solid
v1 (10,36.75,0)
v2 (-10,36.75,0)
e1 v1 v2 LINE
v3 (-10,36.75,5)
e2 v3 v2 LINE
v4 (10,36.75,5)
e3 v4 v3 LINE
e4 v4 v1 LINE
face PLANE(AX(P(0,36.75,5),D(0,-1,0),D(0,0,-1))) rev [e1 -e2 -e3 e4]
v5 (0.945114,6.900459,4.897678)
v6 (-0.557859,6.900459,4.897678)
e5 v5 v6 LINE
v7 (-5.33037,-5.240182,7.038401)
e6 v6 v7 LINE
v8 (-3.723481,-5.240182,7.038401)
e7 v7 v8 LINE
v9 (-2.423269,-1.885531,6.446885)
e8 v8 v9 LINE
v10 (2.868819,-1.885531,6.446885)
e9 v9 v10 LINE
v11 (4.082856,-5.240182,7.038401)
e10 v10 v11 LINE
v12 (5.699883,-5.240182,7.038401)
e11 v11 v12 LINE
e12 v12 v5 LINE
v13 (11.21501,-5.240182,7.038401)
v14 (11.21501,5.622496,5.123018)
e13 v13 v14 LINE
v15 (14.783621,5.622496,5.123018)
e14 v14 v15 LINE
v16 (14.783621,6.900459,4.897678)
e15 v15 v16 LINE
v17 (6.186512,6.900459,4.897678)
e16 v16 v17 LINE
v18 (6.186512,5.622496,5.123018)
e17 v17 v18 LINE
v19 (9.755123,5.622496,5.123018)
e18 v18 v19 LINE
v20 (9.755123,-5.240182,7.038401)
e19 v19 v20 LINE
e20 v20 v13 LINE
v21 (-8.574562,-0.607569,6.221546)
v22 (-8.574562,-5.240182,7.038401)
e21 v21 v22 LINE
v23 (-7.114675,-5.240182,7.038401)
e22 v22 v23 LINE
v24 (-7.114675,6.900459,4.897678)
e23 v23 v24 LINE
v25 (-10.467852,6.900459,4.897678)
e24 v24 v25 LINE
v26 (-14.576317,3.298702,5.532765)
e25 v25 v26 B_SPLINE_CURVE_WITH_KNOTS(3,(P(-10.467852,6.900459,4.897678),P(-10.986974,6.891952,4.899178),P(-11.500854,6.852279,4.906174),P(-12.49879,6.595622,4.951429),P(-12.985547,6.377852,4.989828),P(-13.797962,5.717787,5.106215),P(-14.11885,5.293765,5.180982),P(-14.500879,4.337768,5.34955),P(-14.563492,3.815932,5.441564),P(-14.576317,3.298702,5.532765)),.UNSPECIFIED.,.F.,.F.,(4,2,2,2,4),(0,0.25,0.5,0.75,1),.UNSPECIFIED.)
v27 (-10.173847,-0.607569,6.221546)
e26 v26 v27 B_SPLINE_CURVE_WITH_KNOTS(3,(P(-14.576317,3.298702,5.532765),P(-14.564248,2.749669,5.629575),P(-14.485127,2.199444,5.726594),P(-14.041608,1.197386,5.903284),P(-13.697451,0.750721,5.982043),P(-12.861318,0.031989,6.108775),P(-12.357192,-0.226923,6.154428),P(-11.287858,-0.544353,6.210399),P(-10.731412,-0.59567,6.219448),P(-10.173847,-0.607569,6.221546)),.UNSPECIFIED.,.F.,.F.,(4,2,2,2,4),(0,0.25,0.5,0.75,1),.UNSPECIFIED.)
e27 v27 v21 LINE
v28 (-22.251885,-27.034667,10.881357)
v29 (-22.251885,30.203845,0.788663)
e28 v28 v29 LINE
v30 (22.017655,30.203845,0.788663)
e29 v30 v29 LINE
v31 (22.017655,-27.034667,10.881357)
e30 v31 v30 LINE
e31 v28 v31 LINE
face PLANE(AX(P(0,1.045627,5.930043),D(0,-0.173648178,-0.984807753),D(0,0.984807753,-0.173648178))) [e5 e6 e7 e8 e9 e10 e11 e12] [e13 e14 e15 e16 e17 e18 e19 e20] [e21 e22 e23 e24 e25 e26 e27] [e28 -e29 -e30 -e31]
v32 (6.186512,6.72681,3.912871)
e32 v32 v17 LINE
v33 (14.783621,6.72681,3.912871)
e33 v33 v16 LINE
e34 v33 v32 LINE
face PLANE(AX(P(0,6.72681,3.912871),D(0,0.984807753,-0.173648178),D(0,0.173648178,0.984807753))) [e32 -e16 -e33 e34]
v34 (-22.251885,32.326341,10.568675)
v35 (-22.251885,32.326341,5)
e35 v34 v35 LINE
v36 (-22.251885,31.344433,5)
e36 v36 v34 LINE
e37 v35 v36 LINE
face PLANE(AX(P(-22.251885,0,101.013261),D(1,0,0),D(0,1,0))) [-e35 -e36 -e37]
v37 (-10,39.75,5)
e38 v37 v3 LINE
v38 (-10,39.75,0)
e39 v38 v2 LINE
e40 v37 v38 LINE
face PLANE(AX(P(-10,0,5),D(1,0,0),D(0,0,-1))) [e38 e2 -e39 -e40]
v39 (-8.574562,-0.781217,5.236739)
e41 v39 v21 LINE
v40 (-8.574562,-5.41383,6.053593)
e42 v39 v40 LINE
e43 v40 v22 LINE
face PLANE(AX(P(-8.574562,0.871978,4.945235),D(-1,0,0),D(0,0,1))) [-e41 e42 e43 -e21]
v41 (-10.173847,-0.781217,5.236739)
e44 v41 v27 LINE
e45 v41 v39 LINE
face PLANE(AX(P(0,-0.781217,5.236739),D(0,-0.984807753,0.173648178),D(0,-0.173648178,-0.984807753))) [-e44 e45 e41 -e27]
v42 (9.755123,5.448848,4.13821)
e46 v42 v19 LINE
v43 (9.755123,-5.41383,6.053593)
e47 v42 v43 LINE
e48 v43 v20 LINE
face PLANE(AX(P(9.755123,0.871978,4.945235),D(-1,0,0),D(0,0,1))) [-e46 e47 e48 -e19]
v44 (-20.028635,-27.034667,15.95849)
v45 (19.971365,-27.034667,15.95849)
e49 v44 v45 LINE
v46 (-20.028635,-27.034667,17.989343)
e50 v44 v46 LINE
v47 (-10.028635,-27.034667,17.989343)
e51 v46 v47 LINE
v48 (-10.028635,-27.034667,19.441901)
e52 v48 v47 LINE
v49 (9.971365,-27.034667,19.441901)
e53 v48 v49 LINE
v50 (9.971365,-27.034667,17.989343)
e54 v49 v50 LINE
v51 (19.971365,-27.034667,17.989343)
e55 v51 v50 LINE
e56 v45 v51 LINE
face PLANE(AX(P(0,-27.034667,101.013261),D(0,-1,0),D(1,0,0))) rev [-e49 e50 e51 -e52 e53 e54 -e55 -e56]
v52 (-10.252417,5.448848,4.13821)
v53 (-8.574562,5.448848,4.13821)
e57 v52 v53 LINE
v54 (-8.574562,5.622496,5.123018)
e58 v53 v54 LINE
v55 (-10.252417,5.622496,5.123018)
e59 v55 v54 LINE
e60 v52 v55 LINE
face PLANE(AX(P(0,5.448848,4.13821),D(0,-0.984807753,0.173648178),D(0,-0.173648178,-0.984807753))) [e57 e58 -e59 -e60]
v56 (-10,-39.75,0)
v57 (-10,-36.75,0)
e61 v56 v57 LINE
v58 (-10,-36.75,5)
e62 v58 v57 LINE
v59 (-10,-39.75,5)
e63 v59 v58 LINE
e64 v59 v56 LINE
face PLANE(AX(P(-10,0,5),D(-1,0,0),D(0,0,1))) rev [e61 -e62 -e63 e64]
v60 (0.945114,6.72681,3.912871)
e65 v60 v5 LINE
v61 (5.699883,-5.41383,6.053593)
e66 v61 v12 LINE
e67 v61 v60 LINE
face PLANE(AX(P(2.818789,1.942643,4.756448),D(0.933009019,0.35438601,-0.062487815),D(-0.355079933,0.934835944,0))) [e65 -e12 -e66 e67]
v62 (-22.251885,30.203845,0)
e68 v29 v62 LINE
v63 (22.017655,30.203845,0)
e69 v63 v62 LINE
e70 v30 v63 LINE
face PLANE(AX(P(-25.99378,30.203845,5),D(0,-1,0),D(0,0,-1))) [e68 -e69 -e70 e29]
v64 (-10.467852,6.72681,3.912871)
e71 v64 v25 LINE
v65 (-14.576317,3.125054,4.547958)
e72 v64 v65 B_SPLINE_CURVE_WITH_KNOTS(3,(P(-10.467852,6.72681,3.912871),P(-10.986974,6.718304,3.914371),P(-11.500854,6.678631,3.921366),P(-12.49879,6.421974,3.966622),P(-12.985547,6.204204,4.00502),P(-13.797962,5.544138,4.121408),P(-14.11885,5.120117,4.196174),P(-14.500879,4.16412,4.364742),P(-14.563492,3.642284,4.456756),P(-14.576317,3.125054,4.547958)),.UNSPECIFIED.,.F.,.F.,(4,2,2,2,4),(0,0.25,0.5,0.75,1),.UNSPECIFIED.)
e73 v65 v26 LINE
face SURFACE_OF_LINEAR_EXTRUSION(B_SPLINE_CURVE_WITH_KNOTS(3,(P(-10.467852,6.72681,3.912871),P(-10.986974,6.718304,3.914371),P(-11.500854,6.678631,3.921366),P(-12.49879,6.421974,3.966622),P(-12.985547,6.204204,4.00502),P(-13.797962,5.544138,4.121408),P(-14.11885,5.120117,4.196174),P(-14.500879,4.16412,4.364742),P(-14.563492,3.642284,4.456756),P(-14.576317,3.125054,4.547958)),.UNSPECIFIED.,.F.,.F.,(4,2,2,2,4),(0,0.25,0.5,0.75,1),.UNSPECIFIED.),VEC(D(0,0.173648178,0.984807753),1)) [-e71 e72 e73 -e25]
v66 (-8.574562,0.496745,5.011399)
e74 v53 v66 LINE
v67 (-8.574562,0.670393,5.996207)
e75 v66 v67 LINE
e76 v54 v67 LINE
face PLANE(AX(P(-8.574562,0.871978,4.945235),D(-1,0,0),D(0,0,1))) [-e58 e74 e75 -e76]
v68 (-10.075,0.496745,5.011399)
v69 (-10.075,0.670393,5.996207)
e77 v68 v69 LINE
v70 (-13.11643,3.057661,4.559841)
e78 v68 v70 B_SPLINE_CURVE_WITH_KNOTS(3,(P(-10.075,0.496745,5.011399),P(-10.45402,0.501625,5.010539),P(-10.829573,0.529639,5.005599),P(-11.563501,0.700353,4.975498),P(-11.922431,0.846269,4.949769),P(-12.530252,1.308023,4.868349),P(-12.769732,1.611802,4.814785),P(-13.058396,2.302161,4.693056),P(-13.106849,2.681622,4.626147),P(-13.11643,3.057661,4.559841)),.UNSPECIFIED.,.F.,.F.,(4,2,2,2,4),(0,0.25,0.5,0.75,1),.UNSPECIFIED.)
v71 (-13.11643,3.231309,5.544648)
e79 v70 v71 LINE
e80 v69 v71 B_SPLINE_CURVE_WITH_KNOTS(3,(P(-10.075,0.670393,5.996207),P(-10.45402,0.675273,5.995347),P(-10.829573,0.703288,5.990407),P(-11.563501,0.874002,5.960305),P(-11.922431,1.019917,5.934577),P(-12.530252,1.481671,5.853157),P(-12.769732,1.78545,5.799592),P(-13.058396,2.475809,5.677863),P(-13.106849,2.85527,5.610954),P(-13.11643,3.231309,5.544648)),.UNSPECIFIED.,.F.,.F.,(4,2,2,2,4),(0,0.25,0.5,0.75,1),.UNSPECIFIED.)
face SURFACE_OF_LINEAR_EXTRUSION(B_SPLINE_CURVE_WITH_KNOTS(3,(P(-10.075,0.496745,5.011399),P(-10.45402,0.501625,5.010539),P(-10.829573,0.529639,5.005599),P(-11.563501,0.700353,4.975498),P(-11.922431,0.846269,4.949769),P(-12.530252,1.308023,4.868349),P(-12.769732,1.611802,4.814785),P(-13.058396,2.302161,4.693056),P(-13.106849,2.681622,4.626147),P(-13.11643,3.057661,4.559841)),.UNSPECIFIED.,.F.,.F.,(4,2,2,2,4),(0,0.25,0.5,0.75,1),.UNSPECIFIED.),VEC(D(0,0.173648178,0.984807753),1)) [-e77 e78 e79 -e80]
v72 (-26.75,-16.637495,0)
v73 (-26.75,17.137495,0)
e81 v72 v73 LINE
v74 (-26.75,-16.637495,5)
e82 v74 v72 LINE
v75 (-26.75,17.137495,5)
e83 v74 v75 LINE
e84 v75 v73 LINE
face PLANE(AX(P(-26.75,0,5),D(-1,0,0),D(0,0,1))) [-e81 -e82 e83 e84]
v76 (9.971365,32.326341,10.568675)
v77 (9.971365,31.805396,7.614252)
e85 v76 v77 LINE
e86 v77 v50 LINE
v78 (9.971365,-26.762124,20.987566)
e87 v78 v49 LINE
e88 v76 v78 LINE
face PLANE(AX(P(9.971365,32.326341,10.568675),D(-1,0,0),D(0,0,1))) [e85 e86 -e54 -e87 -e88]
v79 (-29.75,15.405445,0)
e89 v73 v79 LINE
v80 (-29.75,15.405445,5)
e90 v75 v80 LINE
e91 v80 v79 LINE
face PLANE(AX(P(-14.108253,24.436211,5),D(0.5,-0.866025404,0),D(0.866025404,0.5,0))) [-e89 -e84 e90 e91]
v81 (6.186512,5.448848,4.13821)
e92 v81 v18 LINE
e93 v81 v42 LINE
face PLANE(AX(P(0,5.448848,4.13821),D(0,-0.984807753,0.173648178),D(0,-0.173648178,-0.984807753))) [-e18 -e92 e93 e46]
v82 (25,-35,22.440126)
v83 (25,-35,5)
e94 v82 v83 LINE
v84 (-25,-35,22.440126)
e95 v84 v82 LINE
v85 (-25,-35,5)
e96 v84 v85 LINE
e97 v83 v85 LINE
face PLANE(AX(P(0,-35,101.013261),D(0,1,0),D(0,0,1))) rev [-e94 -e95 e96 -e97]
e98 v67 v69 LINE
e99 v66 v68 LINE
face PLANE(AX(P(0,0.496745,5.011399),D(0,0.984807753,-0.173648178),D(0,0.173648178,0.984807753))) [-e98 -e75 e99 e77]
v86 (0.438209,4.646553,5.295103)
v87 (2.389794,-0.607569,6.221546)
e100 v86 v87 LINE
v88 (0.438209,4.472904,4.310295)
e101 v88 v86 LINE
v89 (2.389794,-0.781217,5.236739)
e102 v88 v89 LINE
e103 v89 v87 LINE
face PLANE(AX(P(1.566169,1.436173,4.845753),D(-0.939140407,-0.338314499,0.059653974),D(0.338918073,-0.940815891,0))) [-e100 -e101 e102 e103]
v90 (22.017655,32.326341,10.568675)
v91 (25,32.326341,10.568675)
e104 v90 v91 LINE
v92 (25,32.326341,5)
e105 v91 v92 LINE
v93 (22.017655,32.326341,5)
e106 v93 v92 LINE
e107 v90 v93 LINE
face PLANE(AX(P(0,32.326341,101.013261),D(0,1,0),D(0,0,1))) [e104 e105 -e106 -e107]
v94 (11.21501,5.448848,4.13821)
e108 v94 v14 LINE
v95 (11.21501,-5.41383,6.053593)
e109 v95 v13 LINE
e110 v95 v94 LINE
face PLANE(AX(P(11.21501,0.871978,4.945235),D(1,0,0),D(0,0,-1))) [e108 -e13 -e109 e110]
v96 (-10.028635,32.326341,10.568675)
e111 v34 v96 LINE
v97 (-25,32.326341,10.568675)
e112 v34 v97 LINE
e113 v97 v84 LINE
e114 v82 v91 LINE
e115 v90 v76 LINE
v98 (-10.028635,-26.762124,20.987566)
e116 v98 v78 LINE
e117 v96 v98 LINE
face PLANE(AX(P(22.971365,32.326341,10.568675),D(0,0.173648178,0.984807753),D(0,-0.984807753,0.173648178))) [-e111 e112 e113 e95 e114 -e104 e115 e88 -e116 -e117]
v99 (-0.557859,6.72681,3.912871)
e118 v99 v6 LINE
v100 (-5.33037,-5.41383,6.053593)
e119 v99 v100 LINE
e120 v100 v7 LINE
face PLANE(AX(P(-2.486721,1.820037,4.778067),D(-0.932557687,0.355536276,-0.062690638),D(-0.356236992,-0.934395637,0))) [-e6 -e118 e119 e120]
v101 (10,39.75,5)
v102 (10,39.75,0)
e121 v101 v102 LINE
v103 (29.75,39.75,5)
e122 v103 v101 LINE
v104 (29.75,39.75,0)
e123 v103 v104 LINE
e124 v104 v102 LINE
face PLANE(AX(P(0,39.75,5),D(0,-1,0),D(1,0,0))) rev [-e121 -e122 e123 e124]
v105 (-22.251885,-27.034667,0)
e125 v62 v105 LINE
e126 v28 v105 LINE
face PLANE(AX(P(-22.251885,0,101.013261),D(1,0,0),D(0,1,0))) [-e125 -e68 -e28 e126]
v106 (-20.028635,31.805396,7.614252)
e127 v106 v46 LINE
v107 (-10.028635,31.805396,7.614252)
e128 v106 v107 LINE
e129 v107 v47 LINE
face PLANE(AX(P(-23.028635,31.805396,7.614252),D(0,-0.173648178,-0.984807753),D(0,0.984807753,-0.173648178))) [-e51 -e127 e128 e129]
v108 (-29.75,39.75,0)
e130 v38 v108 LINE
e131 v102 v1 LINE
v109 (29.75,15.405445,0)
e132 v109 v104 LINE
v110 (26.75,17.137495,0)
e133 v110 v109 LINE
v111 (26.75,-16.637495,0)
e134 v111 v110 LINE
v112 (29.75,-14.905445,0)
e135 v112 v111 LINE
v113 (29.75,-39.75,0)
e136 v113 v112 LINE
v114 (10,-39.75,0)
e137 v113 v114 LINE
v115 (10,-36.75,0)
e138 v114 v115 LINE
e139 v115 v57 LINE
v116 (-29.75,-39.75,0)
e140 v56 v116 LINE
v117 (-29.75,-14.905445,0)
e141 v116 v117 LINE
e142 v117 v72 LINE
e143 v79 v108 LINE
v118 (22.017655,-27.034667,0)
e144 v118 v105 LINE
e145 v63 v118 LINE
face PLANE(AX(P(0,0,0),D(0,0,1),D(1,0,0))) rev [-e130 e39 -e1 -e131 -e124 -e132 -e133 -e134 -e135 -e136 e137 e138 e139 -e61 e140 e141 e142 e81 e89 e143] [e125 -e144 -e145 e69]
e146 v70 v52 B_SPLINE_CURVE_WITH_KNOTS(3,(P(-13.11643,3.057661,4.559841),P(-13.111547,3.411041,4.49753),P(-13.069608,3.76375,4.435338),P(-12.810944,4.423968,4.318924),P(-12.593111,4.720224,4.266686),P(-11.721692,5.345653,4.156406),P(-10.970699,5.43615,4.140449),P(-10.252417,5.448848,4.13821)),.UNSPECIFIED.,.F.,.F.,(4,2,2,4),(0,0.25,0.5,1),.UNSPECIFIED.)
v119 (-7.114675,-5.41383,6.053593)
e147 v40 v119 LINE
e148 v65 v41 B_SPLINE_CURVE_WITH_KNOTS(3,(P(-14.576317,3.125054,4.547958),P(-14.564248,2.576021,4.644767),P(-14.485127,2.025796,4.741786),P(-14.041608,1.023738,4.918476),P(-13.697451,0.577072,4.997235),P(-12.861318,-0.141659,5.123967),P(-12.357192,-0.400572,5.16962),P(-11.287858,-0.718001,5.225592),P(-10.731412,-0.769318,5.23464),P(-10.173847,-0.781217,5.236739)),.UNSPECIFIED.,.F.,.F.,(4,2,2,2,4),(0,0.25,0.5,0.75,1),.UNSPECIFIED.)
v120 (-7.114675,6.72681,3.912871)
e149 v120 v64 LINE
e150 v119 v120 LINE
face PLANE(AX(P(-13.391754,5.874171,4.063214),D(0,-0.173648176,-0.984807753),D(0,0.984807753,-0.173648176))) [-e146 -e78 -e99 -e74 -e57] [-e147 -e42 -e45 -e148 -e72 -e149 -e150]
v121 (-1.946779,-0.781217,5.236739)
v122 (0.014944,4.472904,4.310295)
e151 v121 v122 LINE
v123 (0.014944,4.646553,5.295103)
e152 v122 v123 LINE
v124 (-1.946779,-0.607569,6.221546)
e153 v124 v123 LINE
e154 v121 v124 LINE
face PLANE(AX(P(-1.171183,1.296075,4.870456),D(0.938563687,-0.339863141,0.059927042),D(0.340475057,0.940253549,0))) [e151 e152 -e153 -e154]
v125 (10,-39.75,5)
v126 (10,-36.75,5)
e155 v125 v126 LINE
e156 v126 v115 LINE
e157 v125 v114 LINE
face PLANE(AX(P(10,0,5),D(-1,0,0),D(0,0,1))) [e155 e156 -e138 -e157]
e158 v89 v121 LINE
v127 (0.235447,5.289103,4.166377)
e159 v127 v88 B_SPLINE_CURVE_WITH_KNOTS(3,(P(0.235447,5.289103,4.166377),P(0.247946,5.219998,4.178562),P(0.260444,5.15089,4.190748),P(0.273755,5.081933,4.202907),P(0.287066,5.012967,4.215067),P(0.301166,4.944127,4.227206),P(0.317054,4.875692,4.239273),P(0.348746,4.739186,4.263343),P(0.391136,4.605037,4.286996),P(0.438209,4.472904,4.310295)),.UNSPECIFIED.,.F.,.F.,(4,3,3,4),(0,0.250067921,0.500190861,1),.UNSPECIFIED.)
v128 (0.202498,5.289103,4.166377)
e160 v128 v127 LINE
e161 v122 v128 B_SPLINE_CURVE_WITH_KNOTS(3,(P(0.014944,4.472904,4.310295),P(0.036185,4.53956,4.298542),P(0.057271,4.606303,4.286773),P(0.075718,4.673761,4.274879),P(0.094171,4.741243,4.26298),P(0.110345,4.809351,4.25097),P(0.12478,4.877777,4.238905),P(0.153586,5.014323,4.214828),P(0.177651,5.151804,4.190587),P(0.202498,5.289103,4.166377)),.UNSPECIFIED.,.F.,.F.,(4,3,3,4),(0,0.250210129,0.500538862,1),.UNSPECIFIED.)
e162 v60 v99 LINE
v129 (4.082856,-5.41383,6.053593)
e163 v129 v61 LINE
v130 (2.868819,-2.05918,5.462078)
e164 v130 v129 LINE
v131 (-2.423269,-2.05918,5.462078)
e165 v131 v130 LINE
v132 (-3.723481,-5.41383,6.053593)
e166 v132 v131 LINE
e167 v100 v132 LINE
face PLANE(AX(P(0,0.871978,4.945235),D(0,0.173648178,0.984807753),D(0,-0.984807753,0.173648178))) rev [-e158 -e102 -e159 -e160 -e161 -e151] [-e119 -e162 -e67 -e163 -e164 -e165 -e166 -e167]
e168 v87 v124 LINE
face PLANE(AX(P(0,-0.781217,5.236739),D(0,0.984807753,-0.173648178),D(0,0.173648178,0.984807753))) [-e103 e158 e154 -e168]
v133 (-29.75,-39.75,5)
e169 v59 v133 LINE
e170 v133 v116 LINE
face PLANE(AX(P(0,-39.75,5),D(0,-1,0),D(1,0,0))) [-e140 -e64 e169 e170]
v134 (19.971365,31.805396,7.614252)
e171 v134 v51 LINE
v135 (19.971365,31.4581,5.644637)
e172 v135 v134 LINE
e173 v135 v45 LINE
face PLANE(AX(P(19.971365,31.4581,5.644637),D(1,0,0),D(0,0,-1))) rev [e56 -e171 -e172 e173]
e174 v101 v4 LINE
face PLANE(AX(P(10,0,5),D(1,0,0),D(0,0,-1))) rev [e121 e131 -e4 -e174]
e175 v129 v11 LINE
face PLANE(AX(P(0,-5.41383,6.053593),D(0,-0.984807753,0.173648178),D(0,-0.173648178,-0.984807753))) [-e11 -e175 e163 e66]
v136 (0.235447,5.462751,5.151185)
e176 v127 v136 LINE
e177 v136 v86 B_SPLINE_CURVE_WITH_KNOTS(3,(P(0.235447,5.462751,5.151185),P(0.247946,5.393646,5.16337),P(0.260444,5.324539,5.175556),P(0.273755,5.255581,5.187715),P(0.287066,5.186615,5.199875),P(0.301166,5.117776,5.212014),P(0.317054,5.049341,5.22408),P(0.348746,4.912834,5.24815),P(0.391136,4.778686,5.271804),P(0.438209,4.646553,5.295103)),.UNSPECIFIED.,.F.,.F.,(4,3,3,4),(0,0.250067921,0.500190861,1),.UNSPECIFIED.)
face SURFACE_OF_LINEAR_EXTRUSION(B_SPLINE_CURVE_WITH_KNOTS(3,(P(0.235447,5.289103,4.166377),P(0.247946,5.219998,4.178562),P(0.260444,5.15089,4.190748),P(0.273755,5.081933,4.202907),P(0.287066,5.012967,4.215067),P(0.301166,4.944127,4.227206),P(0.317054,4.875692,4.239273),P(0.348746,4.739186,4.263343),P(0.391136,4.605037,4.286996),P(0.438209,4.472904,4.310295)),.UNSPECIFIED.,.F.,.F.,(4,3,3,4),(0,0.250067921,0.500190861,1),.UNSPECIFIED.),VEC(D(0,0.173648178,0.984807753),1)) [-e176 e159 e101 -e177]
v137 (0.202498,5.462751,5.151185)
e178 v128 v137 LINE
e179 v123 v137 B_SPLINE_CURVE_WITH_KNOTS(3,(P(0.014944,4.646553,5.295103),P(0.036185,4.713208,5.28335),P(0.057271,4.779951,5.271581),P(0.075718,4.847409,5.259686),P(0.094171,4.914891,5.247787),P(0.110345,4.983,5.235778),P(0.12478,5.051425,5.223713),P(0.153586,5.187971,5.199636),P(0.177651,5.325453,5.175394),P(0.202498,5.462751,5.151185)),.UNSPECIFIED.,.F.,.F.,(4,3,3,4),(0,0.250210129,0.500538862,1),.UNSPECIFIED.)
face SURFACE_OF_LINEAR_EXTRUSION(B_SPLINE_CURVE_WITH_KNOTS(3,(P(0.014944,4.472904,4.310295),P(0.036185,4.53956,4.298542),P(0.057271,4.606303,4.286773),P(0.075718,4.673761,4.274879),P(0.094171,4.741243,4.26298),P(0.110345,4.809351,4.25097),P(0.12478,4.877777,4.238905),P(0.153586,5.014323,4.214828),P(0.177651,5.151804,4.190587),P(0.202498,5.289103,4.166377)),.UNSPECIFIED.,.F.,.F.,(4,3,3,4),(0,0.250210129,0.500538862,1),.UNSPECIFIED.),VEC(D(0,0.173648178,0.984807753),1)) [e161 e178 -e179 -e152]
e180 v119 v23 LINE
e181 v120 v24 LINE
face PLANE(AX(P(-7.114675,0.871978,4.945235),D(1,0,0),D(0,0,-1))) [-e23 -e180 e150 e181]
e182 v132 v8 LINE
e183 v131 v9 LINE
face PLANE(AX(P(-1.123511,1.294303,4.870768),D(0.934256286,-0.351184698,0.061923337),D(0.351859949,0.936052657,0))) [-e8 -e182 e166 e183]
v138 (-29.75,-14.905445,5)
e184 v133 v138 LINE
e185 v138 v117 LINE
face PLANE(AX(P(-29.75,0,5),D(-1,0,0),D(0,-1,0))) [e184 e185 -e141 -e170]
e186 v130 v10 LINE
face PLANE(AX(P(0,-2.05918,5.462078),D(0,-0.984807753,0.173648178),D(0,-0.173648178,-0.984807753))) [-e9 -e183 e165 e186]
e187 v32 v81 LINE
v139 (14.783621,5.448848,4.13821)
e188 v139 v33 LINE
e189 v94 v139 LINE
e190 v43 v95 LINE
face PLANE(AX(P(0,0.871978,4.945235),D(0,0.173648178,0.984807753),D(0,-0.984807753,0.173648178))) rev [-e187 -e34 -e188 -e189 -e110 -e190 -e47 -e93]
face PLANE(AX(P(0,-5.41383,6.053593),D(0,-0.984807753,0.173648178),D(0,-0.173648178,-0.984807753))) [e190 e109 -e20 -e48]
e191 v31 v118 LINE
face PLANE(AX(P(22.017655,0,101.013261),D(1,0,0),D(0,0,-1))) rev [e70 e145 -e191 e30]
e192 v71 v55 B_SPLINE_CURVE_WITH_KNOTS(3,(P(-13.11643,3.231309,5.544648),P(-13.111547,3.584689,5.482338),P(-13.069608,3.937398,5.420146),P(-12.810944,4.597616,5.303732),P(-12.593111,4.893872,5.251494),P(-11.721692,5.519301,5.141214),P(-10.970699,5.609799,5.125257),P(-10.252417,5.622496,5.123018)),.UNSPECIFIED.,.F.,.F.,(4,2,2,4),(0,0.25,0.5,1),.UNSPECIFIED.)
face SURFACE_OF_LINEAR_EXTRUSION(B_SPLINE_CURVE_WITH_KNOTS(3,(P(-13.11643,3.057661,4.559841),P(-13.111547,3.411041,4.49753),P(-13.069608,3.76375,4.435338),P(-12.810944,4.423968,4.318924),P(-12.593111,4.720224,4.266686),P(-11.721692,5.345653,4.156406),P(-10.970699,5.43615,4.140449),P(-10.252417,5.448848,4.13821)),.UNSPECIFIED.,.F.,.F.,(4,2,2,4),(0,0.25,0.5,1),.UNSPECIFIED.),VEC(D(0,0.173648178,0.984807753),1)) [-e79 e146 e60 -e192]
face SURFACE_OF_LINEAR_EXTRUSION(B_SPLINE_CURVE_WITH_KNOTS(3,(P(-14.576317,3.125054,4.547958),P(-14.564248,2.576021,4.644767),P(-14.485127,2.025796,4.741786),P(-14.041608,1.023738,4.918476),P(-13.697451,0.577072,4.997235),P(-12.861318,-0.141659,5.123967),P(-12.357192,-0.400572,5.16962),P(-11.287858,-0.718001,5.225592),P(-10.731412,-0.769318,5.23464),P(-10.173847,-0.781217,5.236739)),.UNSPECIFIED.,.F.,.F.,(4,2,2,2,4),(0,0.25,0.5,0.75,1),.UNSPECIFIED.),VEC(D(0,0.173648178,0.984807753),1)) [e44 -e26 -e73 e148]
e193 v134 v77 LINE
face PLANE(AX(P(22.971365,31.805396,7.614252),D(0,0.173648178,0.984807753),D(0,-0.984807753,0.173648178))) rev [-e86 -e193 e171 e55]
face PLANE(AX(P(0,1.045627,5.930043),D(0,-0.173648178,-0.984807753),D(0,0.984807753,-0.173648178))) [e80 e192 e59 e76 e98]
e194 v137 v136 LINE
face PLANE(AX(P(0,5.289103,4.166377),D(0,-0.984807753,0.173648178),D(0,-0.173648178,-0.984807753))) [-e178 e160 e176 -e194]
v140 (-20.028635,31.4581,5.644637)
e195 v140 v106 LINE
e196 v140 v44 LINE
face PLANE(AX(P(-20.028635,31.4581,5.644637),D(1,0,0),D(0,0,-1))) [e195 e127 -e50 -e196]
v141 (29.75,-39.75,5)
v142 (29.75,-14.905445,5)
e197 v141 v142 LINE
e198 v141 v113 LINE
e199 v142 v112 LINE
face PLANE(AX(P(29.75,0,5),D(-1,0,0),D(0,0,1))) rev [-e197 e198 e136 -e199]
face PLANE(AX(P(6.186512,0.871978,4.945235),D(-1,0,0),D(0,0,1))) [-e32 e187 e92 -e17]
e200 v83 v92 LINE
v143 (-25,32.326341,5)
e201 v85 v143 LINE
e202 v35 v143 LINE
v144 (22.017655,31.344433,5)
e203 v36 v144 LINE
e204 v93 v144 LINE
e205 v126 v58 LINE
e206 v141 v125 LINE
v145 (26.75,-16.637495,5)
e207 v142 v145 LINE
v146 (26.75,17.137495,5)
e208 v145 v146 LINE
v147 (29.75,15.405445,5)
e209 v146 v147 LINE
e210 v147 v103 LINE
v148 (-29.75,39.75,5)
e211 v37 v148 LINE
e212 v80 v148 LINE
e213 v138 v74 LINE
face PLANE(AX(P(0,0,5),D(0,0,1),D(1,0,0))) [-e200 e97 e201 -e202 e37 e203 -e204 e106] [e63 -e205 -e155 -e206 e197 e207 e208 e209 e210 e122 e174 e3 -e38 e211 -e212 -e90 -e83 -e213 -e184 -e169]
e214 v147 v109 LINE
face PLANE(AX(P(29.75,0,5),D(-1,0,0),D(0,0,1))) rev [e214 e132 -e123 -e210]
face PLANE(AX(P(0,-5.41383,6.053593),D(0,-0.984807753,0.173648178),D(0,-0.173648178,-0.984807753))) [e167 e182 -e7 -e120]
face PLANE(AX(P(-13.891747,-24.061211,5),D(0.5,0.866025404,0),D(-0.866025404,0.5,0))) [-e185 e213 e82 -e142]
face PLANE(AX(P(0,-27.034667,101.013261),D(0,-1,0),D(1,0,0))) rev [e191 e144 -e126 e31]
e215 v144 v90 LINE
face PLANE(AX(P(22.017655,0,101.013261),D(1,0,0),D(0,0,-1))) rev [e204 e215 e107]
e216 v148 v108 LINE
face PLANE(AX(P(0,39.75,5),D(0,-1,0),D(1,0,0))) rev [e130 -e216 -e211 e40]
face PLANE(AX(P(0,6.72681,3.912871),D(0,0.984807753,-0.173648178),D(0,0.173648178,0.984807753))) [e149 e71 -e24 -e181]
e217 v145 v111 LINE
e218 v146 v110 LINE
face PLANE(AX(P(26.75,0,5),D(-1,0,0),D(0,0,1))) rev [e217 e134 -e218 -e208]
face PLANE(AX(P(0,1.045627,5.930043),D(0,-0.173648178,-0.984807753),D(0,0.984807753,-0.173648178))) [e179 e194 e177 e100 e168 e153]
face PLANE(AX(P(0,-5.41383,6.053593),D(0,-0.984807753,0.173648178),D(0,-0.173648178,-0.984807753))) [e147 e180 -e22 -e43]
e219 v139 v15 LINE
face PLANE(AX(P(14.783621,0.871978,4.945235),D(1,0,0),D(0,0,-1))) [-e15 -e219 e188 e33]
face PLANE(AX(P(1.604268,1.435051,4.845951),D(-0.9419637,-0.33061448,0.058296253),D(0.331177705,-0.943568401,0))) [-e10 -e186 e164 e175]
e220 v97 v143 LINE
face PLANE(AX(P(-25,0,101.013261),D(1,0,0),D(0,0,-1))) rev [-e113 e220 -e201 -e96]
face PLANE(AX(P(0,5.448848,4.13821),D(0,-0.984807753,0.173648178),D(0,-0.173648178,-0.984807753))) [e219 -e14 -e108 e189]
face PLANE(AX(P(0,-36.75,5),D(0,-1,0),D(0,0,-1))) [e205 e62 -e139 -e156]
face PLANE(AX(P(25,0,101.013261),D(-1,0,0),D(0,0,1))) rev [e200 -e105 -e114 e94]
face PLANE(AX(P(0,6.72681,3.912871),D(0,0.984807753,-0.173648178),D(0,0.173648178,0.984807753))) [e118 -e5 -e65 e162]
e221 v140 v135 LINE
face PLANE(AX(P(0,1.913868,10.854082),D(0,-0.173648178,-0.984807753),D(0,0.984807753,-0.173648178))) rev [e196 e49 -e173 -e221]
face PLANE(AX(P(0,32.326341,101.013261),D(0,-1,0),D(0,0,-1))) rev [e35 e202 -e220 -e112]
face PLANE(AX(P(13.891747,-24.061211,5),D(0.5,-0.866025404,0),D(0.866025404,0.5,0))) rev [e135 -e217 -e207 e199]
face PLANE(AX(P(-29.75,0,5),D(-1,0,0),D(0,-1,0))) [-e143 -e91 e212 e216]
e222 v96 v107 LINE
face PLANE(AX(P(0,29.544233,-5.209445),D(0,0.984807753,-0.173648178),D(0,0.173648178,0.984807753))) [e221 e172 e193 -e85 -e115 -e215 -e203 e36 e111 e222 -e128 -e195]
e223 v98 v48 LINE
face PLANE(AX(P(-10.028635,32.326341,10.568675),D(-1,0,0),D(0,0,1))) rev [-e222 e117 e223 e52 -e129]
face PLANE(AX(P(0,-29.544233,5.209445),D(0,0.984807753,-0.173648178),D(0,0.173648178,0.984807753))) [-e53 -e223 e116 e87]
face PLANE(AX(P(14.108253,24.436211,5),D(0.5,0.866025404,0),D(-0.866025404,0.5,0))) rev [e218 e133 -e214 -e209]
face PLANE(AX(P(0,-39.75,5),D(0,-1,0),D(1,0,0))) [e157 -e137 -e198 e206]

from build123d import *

# Parameters (mm, degrees)
BOSS_EXTRUDE1_DEPTH = 5
SKETCH8_W           = 50
SKETCH8_H           = 70
CUT_EXTRUDE2_DEPTH  = 50
BOSS_EXTRUDE2_START = -30
SKETCH6_W           = 3
SKETCH6_H           = 2
SKETCH6_H_2         = 3
SKETCH6_W_2         = 10
BOSS_EXTRUDE2_DEPTH = 60
BOSS_EXTRUDE3_START = -30
SKETCH7_W           = 46
SKETCH7_H           = 5
BOSS_EXTRUDE3_DEPTH = 3
SKETCH11_W          = 46
SKETCH11_H          = 63
BOSS_EXTRUDE4_DEPTH = 5
BOSS_EXTRUDE6_REACH = 56.109
SKETCH13_W          = 51.830863245
SKETCH13_H          = 5.290230228
BOSS_EXTRUDE7_DEPTH = 5
BOSS_EXTRUDE8_START = 5.021523682
BOSS_EXTRUDE8_DEPTH = 1.000000021


# Read off the part's stored shape, not the designer's step: Boss-Extrude8
with BuildPart() as part:
    # Sketch4 → Boss-Extrude1 (new body)
    with BuildSketch(Plane(origin=(0, 0, 0), x_dir=(0, 1, 0), z_dir=(0, 0, 1))):
        Polygon((-39.75, -29.75), (-14.905444566, -29.75), (-16.637495374, -26.75), (0.24999995, -26.75), (17.137495374, -26.75), (15.405444566, -29.75), (39.75, -29.75), (39.75, -10), (36.75, -10), (36.75, 10), (39.75, 10), (39.75, 29.75), (15.405444566, 29.75), (17.137495374, 26.75), (0.250000065, 26.75), (-16.637495374, 26.75), (-14.905444566, 29.75), (-39.75, 29.75), (-39.75, 10), (-36.75, 10), (-36.75, -10), (-39.75, -10), align=None)
    extrude(amount=BOSS_EXTRUDE1_DEPTH)

    # Sketch8 → Cut-Extrude2 (cut)
    with BuildSketch(Plane(origin=(0, 0, 0), x_dir=(1, 0, 0), z_dir=(0, 0, -1))):
        Rectangle(SKETCH8_W, SKETCH8_H)
    extrude(amount=-CUT_EXTRUDE2_DEPTH, mode=Mode.SUBTRACT)



with BuildPart() as body_2:
    # Sketch6 → Boss-Extrude2 (new body)
    with BuildSketch(Plane(origin=(0, -0.558315077, -3.166362145), x_dir=(1, 0, 0), z_dir=(0, -0.9848077530122069, 0.1736481776669375)).offset(BOSS_EXTRUDE2_START)):
        with Locations((-21.528635138, 15.236732087)):
            Rectangle(SKETCH6_W, SKETCH6_H)
        with Locations((-21.528635138, 17.736732087)):
            Rectangle(SKETCH6_W, SKETCH6_H_2)
        with Locations((-15.028635138, 17.736732087)):
            Rectangle(SKETCH6_W_2, SKETCH6_H_2)
        with Locations((21.471364862, 15.236732087)):
            Rectangle(SKETCH6_W, SKETCH6_H)
        with Locations((21.471364862, 17.736732087)):
            Rectangle(SKETCH6_W, SKETCH6_H_2)
        with Locations((14.971364862, 17.736732087)):
            Rectangle(SKETCH6_W_2, SKETCH6_H_2)
    extrude(amount=BOSS_EXTRUDE2_DEPTH)



with BuildPart() as body_3:
    # Sketch7 → Boss-Extrude3 (new body)
    with BuildSketch(Plane(origin=(0, 0, 0), x_dir=(-1, 0, 0), z_dir=(0, 0.9848077530122069, -0.1736481776669375)).offset(BOSS_EXTRUDE3_START)):
        with Locations((0.028635138, 13.521523703)):
            Rectangle(SKETCH7_W, SKETCH7_H)
    extrude(amount=-BOSS_EXTRUDE3_DEPTH)


with BuildPart() as body_2_1:
    add(body_2.part)

    add(body_3.part)  # Boss-Extrude4 merges body 3
    # Sketch11 → Boss-Extrude4 (add)
    with BuildSketch(Plane(origin=(0, 1.913867506, 10.854081993), x_dir=(1, 0, 0), z_dir=(0, -0.17364817766693746, -0.9848077530122068))):
        with Locations((-0.028635138, 1.5)):
            Rectangle(SKETCH11_W, SKETCH11_H)
    extrude(amount=BOSS_EXTRUDE4_DEPTH)


with BuildPart() as part_1:
    add(part.part)

    add(body_2_1.part)  # Boss-Extrude6 merges body 2
    # Boss-Extrude6: up to this plane
    boss_extrude6_end = Plane(origin=(22.971364862, 32.326340985, 10.568675428), z_dir=(0, 0.17364817766693744, 0.9848077530122069))
    # Sketch12 → Boss-Extrude6 (add, up to the surface)
    with BuildSketch(Plane(origin=(0, 0, 0), x_dir=(1, 0, 0), z_dir=(0, 0, -1)), mode=Mode.PRIVATE) as boss_extrude6_sk1:
        Polygon((-25, -32.326340985), (-22.25188492, -32.326340985), (-22.25188492, 27.03466657), (22.017654552, 27.03466657), (22.017654552, -32.326340985), (25, -32.326340985), (25, 35), (-25, 35), align=None)
    boss_extrude6_tool1 = split(extrude(boss_extrude6_sk1.sketch, amount=-BOSS_EXTRUDE6_REACH, mode=Mode.PRIVATE), bisect_by=boss_extrude6_end, keep=Keep.BOTH, mode=Mode.PRIVATE)
    add(boss_extrude6_tool1.solids().sort_by_distance((-23.625942, 31.487721, 0))[0])

    # Sketch13 → Boss-Extrude7 (add)
    with BuildSketch(Plane(origin=(0, 0, 0), x_dir=(1, 0, 0), z_dir=(0, 0, -1))):
        with Locations((-0.078348401, -32.848959795)):
            Rectangle(SKETCH13_W, SKETCH13_H)
    extrude(amount=-BOSS_EXTRUDE7_DEPTH)

    # Boss-Extrude8 outline → Boss-Extrude8 (add)
    # profile 1 of 3: a face of its own
    with BuildSketch(Plane(origin=(0, 0, 0), x_dir=(1, 0, 0), z_dir=(0, 0.1736481776669375, 0.9848077530122069)).offset(BOSS_EXTRUDE8_START)):
        with BuildLine():
            add(Edge.make_bspline(
                [(-10.467851841, 5.945152171), (-10.986974105, 5.93651447), (-11.500854153, 5.896229421), (-12.498790484, 5.635612757), (-12.985546819, 5.414483257), (-13.797961559, 4.74423563), (-14.118849525, 4.313672985), (-14.500878838, 3.342927953), (-14.563491586, 2.813042118), (-14.576316895, 2.28783257)],
                knots=[0, 0, 0, 0, 0.25, 0.25, 0.5, 0.5, 0.75, 0.75, 1, 1, 1, 1], degree=3))
            add(Edge.make_bspline(
                [(-14.576316895, 2.28783257), (-14.564248114, 1.730329849), (-14.485127057, 1.171617147), (-14.041607684, 0.154100247), (-13.697450783, -0.299455445), (-12.861318405, -1.029274155), (-12.357191638, -1.292181087), (-11.287857522, -1.614507239), (-10.731412411, -1.666616468), (-10.173846939, -1.678699083)],
                knots=[0, 0, 0, 0, 0.25, 0.25, 0.5, 0.5, 0.75, 0.75, 1, 1, 1, 1], degree=3))
            Line((-10.173846939, -1.678699083), (-8.574561652, -1.678699083))
            Line((-8.574561652, -1.678699083), (-8.574561652, -6.382777516))
            Line((-8.574561652, -6.382777516), (-7.114675242, -6.382777516))
            Line((-7.114675242, -6.382777516), (-7.114675242, 5.945152171))
            Line((-7.114675242, 5.945152171), (-10.467851841, 5.945152171))
        make_face()
        with BuildLine():
            Line((-8.574561652, -0.381022274), (-10.075000463, -0.381022274))
            add(Edge.make_bspline(
                [(-10.075000463, -0.381022274), (-10.454019642, -0.376067015), (-10.82957333, -0.347620207), (-11.563501324, -0.174272567), (-11.922431464, -0.026106182), (-12.530252018, 0.44277106), (-12.769732325, 0.751236277), (-13.058396455, 1.452245522), (-13.106849265, 1.837560064), (-13.116430485, 2.219400395)],
                knots=[0, 0, 0, 0, 0.25, 0.25, 0.5, 0.5, 0.75, 0.75, 1, 1, 1, 1], degree=3))
            add(Edge.make_bspline(
                [(-13.116430485, 2.219400395), (-13.111547413, 2.5782319), (-13.069607652, 2.936381873), (-12.8109443, 3.606784644), (-12.593110897, 3.90761083), (-11.721692221, 4.542687822), (-10.970699083, 4.634581597), (-10.252417214, 4.647475362)],
                knots=[0, 0, 0, 0, 0.25, 0.25, 0.5, 0.5, 1, 1, 1, 1], degree=3))
            Line((-10.252417214, 4.647475362), (-8.574561652, 4.647475362))
            Line((-8.574561652, 4.647475362), (-8.574561652, -0.381022274))
        make_face(mode=Mode.SUBTRACT)
    # profile 2 of 3: a face of its own
    with BuildSketch(Plane(origin=(0, 0, 0), x_dir=(1, 0, 0), z_dir=(0, 0.1736481776669375, 0.9848077530122069)).offset(BOSS_EXTRUDE8_START)):
        Polygon((14.783620913, 4.647475362), (14.783620913, 5.945152171), (6.186512052, 5.945152171), (6.186512052, 4.647475362), (9.755123278, 4.647475362), (9.755123278, -6.382777516), (11.215009688, -6.382777516), (11.215009688, 4.647475362), align=None)
    # profile 3 of 3: a face of its own
    with BuildSketch(Plane(origin=(0, 0, 0), x_dir=(1, 0, 0), z_dir=(0, 0.1736481776669375, 0.9848077530122069)).offset(BOSS_EXTRUDE8_START)):
        Polygon((5.699883249, -6.382777516), (0.945114315, 5.945152171), (-0.55785902, 5.945152171), (-5.330369629, -6.382777516), (-3.723480768, -6.382777516), (-2.423269434, -2.976375892), (2.868818804, -2.976375892), (4.082856287, -6.382777516), align=None)
        with BuildLine():
            Line((0.202498485, 4.485265761), (0.23544731, 4.485265761))
            add(Edge.make_bspline(
                [(0.23544731, 4.485265761), (0.247945589, 4.41509498), (0.260444435, 4.344921063), (0.273754544, 4.274899734), (0.287066266, 4.20486992), (0.301165705, 4.134968363), (0.317053985, 4.065477793), (0.34874631, 3.92686507), (0.391135692, 3.790647481), (0.438209312, 3.65647608)],
                knots=[0, 0, 0, 0, 0.250067921, 0.250067921, 0.250067921, 0.500190861, 0.500190861, 0.500190861, 1, 1, 1, 1], degree=3))
            Line((0.438209312, 3.65647608), (2.389793575, -1.678699083))
            Line((2.389793575, -1.678699083), (-1.94677873, -1.678699083))
            Line((-1.94677873, -1.678699083), (0.014943634, 3.65647608))
            add(Edge.make_bspline(
                [(0.014943634, 3.65647608), (0.036185093, 3.724160229), (0.057270848, 3.791932402), (0.075717575, 3.860431029), (0.094170953, 3.928954356), (0.110345138, 3.998113348), (0.124780214, 4.067594296), (0.153586161, 4.206247155), (0.177650794, 4.345849154), (0.202498485, 4.485265761)],
                knots=[0, 0, 0, 0, 0.250210129, 0.250210129, 0.250210129, 0.500538862, 0.500538862, 0.500538862, 1, 1, 1, 1], degree=3))
        make_face(mode=Mode.SUBTRACT)
    extrude(amount=BOSS_EXTRUDE8_DEPTH)


solid = part_1.part
